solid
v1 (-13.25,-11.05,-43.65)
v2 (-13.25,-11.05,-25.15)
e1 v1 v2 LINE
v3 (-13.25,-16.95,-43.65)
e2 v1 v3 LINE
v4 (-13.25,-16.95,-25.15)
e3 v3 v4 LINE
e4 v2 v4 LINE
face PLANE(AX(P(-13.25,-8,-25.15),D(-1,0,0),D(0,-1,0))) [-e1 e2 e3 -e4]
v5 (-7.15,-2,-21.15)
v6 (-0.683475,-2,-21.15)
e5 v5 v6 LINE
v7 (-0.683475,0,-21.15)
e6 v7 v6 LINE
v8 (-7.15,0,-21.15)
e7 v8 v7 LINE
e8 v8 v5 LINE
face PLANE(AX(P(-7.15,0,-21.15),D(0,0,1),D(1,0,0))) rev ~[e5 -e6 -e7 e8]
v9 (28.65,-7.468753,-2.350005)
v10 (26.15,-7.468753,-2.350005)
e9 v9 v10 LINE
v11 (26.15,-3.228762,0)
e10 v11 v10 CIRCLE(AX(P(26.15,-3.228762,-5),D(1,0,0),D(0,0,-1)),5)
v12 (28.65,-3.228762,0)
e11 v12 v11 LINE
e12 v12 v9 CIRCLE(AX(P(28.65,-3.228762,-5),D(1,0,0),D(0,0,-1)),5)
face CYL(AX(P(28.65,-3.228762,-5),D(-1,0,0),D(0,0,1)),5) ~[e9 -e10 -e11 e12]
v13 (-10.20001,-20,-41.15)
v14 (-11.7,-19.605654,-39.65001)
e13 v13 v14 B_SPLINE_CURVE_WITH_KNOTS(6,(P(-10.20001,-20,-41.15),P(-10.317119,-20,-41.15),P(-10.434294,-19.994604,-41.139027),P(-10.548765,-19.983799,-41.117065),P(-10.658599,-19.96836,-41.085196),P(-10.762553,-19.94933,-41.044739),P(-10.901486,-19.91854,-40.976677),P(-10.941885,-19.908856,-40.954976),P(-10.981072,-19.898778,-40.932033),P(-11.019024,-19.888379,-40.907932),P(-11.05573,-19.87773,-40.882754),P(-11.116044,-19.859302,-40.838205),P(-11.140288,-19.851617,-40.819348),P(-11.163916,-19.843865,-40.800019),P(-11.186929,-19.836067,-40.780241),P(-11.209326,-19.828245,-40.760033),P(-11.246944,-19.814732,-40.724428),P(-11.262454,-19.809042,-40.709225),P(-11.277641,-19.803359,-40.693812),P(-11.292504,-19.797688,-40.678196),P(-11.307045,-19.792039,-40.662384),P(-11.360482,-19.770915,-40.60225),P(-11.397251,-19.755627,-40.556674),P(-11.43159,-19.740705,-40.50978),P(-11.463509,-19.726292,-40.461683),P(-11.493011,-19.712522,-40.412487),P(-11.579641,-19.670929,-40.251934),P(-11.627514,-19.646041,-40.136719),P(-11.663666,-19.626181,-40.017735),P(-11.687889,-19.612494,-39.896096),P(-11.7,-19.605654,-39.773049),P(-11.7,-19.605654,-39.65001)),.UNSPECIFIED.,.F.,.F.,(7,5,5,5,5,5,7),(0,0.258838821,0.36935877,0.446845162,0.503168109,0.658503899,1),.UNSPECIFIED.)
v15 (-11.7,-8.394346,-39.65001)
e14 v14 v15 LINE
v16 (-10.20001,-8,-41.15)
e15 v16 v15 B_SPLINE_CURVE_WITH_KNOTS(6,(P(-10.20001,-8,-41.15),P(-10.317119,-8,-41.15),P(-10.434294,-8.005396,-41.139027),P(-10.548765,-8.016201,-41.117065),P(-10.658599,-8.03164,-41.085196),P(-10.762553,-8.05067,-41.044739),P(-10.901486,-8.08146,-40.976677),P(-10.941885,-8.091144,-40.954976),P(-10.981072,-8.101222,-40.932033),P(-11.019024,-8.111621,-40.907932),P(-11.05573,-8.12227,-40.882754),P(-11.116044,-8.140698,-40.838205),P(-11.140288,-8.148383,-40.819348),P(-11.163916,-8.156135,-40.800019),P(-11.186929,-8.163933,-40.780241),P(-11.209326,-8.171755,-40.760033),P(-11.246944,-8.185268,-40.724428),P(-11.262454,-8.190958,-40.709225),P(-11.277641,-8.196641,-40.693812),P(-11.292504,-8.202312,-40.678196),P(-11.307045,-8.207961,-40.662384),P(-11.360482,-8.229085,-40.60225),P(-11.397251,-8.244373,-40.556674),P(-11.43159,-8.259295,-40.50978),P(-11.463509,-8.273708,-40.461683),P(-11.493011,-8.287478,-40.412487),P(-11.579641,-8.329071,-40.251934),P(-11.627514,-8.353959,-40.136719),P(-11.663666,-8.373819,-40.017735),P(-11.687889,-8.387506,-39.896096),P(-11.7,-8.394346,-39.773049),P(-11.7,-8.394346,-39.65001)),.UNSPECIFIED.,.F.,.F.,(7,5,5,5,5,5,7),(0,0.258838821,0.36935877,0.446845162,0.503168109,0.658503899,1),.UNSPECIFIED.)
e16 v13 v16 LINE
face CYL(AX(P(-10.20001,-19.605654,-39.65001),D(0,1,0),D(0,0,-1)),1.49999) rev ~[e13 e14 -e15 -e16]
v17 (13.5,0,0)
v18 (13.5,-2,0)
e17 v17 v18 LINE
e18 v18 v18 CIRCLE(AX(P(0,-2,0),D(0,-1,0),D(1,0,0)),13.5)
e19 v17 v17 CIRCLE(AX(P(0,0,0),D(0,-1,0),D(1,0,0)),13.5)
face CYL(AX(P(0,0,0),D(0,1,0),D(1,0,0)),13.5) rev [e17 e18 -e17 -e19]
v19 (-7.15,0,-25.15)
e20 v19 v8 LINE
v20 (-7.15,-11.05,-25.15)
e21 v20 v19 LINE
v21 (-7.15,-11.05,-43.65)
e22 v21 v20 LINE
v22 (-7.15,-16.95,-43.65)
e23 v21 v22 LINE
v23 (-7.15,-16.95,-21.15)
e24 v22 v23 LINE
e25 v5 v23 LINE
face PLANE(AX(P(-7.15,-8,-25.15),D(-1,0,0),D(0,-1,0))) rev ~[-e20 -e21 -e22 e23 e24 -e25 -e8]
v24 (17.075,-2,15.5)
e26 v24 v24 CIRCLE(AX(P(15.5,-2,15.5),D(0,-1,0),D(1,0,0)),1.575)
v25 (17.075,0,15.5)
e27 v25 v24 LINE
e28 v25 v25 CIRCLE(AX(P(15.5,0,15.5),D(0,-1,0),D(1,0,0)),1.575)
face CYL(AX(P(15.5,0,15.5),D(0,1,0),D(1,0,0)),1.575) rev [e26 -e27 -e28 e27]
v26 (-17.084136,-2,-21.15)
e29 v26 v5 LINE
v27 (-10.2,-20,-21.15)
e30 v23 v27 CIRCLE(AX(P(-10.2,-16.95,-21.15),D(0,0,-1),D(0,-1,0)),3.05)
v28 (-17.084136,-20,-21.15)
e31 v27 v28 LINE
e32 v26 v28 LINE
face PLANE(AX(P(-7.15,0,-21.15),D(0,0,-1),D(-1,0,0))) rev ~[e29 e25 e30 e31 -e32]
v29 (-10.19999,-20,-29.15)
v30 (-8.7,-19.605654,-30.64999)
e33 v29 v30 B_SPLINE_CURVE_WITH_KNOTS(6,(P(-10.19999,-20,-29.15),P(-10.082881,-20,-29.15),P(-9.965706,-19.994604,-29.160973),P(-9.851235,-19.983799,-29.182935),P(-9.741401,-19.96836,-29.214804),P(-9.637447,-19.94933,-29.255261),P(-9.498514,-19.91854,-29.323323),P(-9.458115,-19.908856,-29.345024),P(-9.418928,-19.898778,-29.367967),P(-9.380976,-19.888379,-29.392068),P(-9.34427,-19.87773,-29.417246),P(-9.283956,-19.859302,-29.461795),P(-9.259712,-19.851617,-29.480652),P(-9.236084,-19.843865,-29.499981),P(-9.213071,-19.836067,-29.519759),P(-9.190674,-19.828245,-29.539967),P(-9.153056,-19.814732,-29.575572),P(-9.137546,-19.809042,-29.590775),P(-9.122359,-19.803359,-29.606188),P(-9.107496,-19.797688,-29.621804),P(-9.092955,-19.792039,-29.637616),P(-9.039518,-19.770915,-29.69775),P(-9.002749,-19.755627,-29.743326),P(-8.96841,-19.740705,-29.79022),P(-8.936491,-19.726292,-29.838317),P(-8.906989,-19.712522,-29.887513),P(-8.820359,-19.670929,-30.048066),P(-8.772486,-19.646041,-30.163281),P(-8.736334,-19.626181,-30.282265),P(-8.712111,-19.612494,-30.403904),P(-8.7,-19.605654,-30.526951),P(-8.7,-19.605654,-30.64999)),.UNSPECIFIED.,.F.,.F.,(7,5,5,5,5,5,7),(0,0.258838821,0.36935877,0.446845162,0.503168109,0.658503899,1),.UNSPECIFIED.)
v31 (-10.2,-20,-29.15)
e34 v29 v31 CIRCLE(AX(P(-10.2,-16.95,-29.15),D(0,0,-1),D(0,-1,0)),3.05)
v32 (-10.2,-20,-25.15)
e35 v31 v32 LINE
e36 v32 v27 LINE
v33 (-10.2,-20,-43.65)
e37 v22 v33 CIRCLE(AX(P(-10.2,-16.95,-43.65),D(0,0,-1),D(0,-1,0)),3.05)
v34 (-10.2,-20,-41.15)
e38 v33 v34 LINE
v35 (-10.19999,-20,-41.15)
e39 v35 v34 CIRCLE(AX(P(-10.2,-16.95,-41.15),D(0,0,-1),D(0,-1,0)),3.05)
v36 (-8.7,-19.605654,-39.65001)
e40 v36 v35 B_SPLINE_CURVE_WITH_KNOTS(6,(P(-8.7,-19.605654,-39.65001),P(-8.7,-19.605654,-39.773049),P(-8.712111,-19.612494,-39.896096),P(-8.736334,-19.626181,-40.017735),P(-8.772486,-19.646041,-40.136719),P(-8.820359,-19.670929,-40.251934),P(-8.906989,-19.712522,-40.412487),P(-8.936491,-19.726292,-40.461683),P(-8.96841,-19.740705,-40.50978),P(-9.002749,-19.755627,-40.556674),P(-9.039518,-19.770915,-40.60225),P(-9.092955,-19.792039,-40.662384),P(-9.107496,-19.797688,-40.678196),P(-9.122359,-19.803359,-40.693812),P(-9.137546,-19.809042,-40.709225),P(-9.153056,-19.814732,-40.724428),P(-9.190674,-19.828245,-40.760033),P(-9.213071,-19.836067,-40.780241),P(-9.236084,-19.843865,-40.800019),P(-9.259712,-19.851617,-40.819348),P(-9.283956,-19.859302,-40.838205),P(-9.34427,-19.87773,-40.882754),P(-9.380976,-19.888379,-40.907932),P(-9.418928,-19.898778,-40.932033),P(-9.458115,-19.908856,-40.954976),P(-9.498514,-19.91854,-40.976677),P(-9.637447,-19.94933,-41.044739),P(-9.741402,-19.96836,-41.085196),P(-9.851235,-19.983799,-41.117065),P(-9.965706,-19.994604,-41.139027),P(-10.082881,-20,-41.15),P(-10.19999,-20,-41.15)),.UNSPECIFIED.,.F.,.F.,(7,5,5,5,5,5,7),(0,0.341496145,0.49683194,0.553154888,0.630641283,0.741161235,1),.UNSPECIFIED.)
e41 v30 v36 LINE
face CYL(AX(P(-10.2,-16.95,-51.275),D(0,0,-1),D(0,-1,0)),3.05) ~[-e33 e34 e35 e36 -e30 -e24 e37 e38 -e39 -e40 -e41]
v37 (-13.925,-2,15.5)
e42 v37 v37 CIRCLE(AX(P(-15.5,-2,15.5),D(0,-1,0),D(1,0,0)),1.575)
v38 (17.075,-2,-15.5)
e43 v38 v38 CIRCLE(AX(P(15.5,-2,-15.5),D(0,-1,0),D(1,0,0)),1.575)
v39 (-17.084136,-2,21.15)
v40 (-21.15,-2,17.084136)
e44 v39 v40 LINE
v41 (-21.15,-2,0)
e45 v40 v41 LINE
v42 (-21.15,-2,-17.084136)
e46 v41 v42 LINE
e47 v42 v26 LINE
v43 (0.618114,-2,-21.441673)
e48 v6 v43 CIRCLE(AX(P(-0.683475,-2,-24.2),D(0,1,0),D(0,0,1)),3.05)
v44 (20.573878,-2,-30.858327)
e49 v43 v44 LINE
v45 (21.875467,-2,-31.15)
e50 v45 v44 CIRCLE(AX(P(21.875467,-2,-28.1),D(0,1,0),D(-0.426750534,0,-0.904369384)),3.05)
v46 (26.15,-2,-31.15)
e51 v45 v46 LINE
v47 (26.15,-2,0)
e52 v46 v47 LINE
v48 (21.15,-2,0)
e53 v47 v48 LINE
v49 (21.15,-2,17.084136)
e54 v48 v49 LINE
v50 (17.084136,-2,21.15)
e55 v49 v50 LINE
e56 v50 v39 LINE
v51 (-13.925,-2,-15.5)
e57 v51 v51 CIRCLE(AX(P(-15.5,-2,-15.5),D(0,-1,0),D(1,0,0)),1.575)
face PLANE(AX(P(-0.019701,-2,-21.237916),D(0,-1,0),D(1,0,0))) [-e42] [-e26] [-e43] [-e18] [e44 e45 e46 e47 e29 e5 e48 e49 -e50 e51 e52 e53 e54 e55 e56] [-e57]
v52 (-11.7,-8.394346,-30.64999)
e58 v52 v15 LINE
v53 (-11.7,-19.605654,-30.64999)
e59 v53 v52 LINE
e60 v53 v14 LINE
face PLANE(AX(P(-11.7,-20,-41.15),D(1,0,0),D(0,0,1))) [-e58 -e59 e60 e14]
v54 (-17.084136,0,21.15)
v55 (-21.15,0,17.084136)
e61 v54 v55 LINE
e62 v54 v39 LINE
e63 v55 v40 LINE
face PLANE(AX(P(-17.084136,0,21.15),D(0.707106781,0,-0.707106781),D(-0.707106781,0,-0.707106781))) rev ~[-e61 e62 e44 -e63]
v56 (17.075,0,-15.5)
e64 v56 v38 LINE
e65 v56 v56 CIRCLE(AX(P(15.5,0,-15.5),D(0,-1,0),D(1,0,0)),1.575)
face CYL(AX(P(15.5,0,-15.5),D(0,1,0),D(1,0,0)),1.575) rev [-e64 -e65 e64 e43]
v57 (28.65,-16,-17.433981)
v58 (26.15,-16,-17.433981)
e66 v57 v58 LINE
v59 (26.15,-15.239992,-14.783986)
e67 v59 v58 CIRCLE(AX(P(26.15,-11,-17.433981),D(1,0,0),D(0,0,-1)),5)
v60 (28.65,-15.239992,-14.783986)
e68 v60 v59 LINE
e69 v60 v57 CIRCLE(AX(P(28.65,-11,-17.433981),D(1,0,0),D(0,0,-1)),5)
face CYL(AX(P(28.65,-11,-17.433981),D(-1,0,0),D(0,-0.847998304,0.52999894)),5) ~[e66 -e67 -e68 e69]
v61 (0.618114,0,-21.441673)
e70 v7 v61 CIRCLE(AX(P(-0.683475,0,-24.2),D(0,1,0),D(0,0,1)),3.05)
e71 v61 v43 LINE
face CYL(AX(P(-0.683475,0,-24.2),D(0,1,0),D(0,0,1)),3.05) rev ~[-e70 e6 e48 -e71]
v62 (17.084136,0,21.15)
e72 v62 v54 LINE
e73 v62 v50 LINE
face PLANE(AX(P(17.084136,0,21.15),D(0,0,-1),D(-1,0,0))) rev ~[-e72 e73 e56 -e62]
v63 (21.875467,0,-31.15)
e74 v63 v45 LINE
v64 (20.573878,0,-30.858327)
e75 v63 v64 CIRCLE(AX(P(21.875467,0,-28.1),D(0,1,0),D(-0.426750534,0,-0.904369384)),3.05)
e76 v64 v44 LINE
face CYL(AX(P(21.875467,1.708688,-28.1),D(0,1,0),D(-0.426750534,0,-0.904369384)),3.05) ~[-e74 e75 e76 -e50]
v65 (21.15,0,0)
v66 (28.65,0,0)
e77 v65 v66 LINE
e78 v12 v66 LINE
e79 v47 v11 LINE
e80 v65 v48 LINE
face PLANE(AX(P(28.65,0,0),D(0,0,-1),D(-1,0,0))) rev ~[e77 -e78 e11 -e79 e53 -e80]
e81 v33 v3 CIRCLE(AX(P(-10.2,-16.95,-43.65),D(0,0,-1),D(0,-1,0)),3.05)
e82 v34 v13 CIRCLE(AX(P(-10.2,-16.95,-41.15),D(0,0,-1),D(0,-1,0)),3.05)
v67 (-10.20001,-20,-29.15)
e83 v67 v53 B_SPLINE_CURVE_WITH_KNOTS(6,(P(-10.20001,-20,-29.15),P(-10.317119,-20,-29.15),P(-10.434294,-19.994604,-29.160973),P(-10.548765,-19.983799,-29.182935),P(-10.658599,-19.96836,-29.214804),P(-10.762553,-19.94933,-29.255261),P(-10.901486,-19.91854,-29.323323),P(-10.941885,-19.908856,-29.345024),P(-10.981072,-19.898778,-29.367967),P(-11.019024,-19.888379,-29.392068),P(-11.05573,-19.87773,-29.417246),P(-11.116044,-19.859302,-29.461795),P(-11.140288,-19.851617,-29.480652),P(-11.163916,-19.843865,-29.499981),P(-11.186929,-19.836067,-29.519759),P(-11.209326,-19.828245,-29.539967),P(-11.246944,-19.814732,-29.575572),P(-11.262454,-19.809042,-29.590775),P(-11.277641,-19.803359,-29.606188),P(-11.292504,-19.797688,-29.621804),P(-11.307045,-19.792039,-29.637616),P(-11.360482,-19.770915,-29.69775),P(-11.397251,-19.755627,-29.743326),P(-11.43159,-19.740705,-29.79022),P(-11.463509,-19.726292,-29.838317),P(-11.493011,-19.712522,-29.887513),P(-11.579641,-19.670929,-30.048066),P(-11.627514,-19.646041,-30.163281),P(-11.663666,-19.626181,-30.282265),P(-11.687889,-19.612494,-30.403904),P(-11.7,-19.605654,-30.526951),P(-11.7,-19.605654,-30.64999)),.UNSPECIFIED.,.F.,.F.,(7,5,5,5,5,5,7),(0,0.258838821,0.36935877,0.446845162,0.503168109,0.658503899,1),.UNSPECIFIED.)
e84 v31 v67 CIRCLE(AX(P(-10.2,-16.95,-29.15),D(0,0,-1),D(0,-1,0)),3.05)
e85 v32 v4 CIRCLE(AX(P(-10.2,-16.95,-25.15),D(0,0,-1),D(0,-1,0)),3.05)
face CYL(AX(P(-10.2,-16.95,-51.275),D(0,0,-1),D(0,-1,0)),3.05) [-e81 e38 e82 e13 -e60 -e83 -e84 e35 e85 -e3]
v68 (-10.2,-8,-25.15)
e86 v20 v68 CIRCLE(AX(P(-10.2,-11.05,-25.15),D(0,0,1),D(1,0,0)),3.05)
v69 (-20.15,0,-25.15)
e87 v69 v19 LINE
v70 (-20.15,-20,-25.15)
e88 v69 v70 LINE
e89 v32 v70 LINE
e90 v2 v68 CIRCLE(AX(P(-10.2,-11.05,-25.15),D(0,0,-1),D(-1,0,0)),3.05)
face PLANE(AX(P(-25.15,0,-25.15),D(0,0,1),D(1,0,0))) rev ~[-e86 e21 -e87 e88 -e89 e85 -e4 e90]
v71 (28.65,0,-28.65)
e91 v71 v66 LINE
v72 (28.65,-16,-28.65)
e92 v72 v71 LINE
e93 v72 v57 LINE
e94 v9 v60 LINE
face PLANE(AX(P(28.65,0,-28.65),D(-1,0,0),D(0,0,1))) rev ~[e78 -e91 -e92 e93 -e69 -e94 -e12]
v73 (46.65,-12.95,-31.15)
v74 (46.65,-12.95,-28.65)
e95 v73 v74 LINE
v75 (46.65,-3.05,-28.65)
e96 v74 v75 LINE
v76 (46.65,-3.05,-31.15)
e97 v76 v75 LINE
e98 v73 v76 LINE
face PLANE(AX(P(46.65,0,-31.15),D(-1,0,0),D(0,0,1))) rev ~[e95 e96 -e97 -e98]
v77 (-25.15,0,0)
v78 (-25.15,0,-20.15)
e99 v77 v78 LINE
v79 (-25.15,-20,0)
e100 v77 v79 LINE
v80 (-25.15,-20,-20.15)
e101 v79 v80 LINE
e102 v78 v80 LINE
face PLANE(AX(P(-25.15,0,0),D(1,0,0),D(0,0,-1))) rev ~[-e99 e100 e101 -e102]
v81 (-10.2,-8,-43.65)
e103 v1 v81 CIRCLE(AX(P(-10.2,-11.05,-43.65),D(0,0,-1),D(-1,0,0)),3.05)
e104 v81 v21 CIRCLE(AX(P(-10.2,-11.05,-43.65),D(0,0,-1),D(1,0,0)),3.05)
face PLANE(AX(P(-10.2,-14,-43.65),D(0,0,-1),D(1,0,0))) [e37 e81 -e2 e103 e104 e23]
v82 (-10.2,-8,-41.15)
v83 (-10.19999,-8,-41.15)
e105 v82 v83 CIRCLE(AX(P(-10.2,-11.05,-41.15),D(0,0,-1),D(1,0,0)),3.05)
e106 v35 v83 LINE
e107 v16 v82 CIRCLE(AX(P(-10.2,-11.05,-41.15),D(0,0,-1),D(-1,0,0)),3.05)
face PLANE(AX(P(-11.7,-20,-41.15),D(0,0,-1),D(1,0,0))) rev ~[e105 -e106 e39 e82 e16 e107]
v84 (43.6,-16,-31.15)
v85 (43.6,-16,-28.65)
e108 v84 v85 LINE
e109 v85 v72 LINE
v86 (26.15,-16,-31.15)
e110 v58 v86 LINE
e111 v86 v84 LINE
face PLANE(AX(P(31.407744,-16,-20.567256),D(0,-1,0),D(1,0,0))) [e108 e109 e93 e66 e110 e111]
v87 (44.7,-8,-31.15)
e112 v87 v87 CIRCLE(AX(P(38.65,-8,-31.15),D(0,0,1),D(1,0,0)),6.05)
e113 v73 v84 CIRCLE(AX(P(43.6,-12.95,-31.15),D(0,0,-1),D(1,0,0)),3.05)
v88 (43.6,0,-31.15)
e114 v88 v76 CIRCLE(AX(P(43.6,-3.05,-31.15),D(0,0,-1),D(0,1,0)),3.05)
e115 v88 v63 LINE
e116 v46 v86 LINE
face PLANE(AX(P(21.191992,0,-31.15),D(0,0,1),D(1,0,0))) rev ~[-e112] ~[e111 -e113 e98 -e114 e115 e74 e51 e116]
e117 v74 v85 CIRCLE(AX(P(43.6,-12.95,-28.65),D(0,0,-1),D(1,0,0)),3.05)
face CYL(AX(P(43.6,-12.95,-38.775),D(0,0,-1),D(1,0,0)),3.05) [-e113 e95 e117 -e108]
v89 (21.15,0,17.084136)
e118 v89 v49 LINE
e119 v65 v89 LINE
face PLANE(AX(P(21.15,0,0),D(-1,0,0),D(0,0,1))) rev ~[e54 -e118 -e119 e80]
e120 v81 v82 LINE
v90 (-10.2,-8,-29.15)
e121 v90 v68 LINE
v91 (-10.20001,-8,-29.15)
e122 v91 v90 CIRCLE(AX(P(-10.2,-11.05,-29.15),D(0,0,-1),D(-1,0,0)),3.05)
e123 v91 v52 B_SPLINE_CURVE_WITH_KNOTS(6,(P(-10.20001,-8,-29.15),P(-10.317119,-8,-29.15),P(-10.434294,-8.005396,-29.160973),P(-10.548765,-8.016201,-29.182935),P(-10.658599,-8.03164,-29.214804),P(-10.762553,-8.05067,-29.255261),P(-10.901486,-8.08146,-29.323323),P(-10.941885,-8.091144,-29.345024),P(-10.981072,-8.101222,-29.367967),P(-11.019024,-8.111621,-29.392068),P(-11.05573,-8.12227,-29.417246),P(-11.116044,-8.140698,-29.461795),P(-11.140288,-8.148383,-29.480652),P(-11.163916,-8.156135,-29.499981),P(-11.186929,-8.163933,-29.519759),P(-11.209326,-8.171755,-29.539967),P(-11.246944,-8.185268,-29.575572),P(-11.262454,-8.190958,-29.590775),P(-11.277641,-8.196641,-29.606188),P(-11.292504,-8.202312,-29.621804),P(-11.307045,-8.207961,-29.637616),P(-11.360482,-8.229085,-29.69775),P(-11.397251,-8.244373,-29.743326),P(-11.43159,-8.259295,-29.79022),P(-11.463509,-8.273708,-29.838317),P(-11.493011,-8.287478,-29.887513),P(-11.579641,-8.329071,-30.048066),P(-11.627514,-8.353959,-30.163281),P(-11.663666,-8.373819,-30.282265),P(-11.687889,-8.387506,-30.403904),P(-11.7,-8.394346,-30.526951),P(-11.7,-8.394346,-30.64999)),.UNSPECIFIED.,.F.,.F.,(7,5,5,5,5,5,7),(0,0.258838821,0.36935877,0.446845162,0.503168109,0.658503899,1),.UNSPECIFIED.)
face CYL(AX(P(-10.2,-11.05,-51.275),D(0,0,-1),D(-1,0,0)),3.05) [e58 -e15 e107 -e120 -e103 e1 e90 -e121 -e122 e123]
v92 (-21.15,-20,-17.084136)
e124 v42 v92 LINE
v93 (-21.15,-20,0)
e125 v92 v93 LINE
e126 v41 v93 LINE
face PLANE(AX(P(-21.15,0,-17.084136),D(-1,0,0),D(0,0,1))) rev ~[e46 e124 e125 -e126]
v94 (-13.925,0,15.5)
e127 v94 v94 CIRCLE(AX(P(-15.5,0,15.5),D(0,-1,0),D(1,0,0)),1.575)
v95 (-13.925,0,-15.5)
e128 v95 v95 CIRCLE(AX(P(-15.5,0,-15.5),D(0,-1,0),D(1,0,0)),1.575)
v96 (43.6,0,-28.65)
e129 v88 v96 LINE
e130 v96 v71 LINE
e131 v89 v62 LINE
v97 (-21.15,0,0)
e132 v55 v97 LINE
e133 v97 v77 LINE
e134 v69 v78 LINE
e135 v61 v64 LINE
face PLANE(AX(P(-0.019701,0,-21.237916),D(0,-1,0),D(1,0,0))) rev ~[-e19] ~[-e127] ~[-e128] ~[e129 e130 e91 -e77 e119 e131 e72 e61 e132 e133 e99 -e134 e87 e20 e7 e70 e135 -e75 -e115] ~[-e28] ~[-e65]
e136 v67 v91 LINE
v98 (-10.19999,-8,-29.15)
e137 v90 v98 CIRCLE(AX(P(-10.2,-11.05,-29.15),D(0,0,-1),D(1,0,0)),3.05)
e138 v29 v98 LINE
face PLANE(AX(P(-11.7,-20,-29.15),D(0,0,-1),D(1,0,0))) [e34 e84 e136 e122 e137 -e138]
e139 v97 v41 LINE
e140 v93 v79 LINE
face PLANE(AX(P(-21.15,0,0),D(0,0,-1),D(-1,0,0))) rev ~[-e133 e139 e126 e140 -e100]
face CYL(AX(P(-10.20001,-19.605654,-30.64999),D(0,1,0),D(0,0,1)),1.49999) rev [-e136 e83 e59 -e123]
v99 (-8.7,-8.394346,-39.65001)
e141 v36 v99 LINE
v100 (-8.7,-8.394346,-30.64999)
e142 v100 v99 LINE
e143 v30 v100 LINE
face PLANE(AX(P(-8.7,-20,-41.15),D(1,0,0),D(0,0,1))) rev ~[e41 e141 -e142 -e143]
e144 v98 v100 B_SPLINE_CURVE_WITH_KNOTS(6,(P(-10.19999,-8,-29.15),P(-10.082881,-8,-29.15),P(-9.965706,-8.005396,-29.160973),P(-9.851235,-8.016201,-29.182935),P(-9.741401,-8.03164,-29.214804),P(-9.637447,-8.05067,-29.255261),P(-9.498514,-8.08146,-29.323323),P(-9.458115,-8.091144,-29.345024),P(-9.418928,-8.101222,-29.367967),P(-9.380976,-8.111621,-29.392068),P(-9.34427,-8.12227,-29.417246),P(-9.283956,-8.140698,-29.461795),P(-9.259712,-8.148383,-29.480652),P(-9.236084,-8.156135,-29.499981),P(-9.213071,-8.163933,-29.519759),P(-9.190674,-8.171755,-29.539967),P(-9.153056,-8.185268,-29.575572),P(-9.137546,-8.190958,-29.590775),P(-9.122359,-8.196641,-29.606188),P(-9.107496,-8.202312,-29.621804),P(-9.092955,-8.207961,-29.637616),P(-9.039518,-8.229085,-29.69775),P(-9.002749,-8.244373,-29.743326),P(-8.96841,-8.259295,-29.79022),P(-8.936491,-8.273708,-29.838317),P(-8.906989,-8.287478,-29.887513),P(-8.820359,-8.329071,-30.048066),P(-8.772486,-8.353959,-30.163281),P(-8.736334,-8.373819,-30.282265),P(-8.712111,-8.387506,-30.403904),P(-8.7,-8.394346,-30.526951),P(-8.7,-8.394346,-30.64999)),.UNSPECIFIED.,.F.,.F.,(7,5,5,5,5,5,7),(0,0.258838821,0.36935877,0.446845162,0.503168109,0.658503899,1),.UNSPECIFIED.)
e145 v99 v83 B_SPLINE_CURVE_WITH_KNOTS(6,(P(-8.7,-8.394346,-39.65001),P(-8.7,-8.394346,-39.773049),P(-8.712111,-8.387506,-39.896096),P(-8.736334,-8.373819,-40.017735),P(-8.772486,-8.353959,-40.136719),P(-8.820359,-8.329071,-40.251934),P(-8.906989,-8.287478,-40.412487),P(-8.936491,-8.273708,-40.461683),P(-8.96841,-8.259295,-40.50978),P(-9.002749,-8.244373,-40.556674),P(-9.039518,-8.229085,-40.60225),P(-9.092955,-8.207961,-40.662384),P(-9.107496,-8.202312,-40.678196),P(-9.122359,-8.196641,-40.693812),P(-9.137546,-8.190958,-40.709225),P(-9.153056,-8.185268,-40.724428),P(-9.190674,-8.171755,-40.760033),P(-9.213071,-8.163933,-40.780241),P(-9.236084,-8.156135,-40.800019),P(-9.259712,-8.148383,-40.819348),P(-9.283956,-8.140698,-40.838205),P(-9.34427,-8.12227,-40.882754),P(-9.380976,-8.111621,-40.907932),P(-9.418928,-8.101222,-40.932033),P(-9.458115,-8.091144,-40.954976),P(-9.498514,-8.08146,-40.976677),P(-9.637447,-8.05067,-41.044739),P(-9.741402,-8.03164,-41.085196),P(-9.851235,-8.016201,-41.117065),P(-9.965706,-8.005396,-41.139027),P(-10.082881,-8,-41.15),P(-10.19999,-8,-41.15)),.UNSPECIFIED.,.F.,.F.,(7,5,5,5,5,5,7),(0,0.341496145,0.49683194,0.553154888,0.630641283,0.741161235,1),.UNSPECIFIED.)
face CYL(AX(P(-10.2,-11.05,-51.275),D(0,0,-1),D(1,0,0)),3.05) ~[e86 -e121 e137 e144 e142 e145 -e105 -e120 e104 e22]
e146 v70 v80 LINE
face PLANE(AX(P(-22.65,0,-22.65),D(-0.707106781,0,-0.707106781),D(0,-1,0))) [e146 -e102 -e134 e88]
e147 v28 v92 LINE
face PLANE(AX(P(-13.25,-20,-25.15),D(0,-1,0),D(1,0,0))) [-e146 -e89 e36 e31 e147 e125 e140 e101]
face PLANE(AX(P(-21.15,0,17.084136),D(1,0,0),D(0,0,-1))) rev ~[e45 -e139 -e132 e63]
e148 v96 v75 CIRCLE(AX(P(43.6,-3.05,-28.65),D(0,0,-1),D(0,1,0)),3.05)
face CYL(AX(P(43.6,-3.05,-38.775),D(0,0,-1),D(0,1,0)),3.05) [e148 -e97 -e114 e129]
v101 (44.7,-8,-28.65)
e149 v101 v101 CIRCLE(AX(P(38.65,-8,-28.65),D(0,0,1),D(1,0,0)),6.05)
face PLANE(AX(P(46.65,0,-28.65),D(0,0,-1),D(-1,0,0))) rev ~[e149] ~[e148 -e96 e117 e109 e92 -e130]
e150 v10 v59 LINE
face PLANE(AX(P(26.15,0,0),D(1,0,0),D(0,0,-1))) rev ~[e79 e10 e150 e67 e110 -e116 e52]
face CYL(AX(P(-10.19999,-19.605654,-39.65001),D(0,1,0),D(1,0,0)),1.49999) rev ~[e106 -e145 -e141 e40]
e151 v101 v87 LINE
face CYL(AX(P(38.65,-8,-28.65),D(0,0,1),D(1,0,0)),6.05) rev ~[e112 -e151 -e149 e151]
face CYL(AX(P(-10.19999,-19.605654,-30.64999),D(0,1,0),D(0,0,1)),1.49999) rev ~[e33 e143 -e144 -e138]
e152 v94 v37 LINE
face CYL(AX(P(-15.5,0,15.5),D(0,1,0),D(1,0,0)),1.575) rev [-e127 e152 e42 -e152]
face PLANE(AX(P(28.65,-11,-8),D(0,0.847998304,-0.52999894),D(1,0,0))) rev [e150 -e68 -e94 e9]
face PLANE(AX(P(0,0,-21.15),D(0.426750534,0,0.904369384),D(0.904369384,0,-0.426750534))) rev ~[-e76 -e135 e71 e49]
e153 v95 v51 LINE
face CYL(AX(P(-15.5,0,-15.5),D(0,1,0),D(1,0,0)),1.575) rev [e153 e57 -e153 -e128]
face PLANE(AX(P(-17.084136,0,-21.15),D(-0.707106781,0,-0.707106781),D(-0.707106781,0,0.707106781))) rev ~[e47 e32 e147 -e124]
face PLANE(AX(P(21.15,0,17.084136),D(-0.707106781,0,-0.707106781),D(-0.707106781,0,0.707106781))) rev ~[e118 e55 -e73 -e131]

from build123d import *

# Parameters (mm, degrees)
F0_R         = 1.575
F0_R_2       = 13.5
F0_W         = 5
F0_H         = 21.15
F1_DEPTH     = 2
F2_DEPTH     = 20
F3_DEPTH     = 16
F4_R         = 6.05
F5_DEPTH     = 2.5
F6_W         = 6.1
F6_H         = 12
F7_DEPTH     = 18.5
F8_W         = 3
F8_H         = 12
F9_DEPTH     = 12
F10_T1_DEPTH = 2
F10_T3_DEPTH = 26.125
F10_T5_DEPTH = 37.75
F10_T7_DEPTH = 17.75
F10_T9_DEPTH = 5.4173756904
F11_R        = 1.49999
F12_SIZE     = 5
F13_SIZE2    = 16
F13_SIZE     = 10
F14_R        = 5


# Not quite as in the source:
# - a fillet or chamfer that OpenCascade refuses, or shapes differently, is made with other operations: its cross-section is extruded or revolved along the edge and cut away or added
# - a fillet or chamfer is up to 0.001 mm smaller than in the source, because OpenCascade refuses the exact size
# - a feature names something its author has since deleted; it is built from what else it names


with BuildPart() as f1:
    # F0 (on Front) → F1 (new body)
    with BuildSketch(Plane.XZ):
        Polygon((-21.15, -17.0841360082), (-21.15, 0), (-25.15, 0), (-25.15, -25.15), (-7.15, -25.15), (-7.15, -21.15), (-17.0841360082, -21.15), (-21.15, -21.15), align=None)
        Polygon((21.15, 17.0841360082), (17.0841360082, 21.15), (-17.0841360082, 21.15), (-21.15, 17.0841360082), (-21.15, 0), (-21.15, -17.0841360082), (-17.0841360082, -21.15), (-7.15, -21.15), (0, -21.15), (21.15, -21.15), (21.15, 0), align=None)
        with Locations((-15.5, -15.5)):
            Circle(F0_R, mode=Mode.SUBTRACT)
        with Locations((15.5, -15.5)):
            Circle(F0_R, mode=Mode.SUBTRACT)
        Circle(F0_R_2, mode=Mode.SUBTRACT)
        with Locations((-15.5, 15.5)):
            Circle(F0_R, mode=Mode.SUBTRACT)
        with Locations((15.5, 15.5)):
            Circle(F0_R, mode=Mode.SUBTRACT)
        Polygon((-17.0841360082, -21.15), (-21.15, -17.0841360082), (-21.15, -21.15), align=None)
        Polygon((26.15, -21.15), (21.15, -21.15), (0, -21.15), (21.1919918656, -31.15), (26.15, -31.15), align=None)
        Polygon((28.65, 0), (26.15, 0), (26.15, -21.15), (26.15, -31.15), (46.65, -31.15), (46.65, -28.65), (28.65, -28.65), align=None)
        with Locations((23.65, -10.575)):
            Rectangle(F0_W, F0_H)
    extrude(amount=F1_DEPTH)

    # F0 (on Front) → F2 (join)
    with BuildSketch(Plane.XZ):
        Polygon((-21.15, -17.0841360082), (-21.15, 0), (-25.15, 0), (-25.15, -25.15), (-7.15, -25.15), (-7.15, -21.15), (-17.0841360082, -21.15), (-21.15, -21.15), align=None)
        Polygon((-17.0841360082, -21.15), (-21.15, -17.0841360082), (-21.15, -21.15), align=None)
    extrude(amount=F2_DEPTH)

    # F0 (on Front) → F3 (join)
    with BuildSketch(Plane.XZ):
        Polygon((28.65, 0), (26.15, 0), (26.15, -21.15), (26.15, -31.15), (46.65, -31.15), (46.65, -28.65), (28.65, -28.65), align=None)
    extrude(amount=F3_DEPTH)

    # F4 (on face) → F5 (cut, through all)
    with BuildSketch(Plane.XY.offset(-28.65)):
        with Locations((38.65, -8)):
            Circle(F4_R)
    extrude(amount=-F5_DEPTH, mode=Mode.SUBTRACT)

    # F6 (on face) → F7 (join)
    with BuildSketch(Plane(origin=(0, 0, -25.15), x_dir=(1, 0, 0), z_dir=(0, 0, -1))):
        with Locations((-10.2, 14)):
            Rectangle(F6_W, F6_H)
    extrude(amount=F7_DEPTH)

    # F8 (on face) → F9 (cut, through all)
    with BuildSketch(Plane.XZ.offset(20)):
        with Locations((-10.2, -35.15)):
            Rectangle(F8_W, F8_H)
    extrude(amount=-F9_DEPTH, mode=Mode.SUBTRACT)

    # F10: fillet of radius 3.05 on 8 edges, made by hand

    # F10_s2 → F10_t1 (join)
    with BuildSketch(Plane.XZ):
        with BuildLine():
            ThreePointArc((-0.6834751381, -21.15), (-0.0165404304, -21.2238114818), (0.6181139894, -21.4416733799))
            Line((0.6181139894, -21.4416733799), (0, -21.15))
            Line((0, -21.15), (-0.6834751381, -21.15))
        make_face()
    extrude(amount=F10_T1_DEPTH)

    # F10_s4 → F10_t3 (cut)
    with BuildSketch(Plane.XY.offset(-51.275)):
        with BuildLine():
            ThreePointArc((-13.25, -11.05), (-12.3566756826, -8.8933243174), (-10.2, -8))
            Line((-10.2, -8), (-13.25, -8))
            Line((-13.25, -8), (-13.25, -11.05))
        make_face()
        with BuildLine():
            ThreePointArc((-7.15, -11.05), (-8.0433243174, -8.8933243174), (-10.2, -8))
            Line((-10.2, -8), (-7.15, -8))
            Line((-7.15, -8), (-7.15, -11.05))
        make_face()
        with BuildLine():
            ThreePointArc((-10.2, -20), (-12.3566756826, -19.1066756826), (-13.25, -16.95))
            Line((-13.25, -16.95), (-13.25, -20))
            Line((-13.25, -20), (-10.2, -20))
        make_face()
    extrude(amount=F10_T3_DEPTH, mode=Mode.SUBTRACT)

    # F10_s6 → F10_t5 (cut)
    with BuildSketch(Plane.XY.offset(-51.275)):
        with BuildLine():
            ThreePointArc((-10.2, -20), (-8.0433243174, -19.1066756826), (-7.15, -16.95))
            Line((-7.15, -16.95), (-7.15, -20))
            Line((-7.15, -20), (-10.2, -20))
        make_face()
    extrude(amount=F10_T5_DEPTH, mode=Mode.SUBTRACT)

    # F10_s8 → F10_t7 (cut)
    with BuildSketch(Plane.XY.offset(-38.775)):
        with BuildLine():
            ThreePointArc((46.65, -12.95), (45.7566756826, -15.1066756826), (43.6, -16))
            Line((43.6, -16), (46.65, -16))
            Line((46.65, -16), (46.65, -12.95))
        make_face()
        with BuildLine():
            ThreePointArc((43.6, 0), (45.7566756826, -0.8933243174), (46.65, -3.05))
            Line((46.65, -3.05), (46.65, 0))
            Line((46.65, 0), (43.6, 0))
        make_face()
    extrude(amount=F10_T7_DEPTH, mode=Mode.SUBTRACT)

    # F10_s10 → F10_t9 (cut)
    with BuildSketch(Plane.XZ.offset(-1.7086878452)):
        with BuildLine():
            ThreePointArc((20.5738778763, -30.8583266201), (21.208532296, -31.0761885182), (21.8754670037, -31.15))
            Line((21.8754670037, -31.15), (21.1919918656, -31.15))
            Line((21.1919918656, -31.15), (20.5738778763, -30.8583266201))
        make_face()
    extrude(amount=F10_T9_DEPTH, mode=Mode.SUBTRACT)

    # F11 (radius 1.5 in the source; OpenCascade refuses exactly that, so slightly less here)
    f11_edges = [f1.edges().sort_by_distance(p)[0] for p in [
        (-11.7, -14, -29.15),
        (-8.7, -14, -29.15),
        (-11.7, -14, -41.15),
        (-8.7, -14, -41.15),
    ]]
    fillet(f11_edges, radius=F11_R)

    # F12
    f12_edges = [f1.edges().sort_by_distance(p)[0] for p in [
        (-25.15, -10, -25.15),
    ]]
    chamfer(f12_edges, length=F12_SIZE)

    # F13
    f13_edges = [f1.edges().sort_by_distance(p)[0] for p in [
        (27.4, -16, 0),
    ]]
    f13_side = f1.faces().sort_by_distance((26.65, -6.6, 0))[0]
    chamfer(f13_edges, length=F13_SIZE, length2=F13_SIZE2, reference=f13_side)

    # F14
    f14_edges = [f1.edges().sort_by_distance(p)[0] for p in [
        (27.4, -16, -16),
        (27.4, -6, 0),
    ]]
    fillet(f14_edges, radius=F14_R)


solid = f1.part
